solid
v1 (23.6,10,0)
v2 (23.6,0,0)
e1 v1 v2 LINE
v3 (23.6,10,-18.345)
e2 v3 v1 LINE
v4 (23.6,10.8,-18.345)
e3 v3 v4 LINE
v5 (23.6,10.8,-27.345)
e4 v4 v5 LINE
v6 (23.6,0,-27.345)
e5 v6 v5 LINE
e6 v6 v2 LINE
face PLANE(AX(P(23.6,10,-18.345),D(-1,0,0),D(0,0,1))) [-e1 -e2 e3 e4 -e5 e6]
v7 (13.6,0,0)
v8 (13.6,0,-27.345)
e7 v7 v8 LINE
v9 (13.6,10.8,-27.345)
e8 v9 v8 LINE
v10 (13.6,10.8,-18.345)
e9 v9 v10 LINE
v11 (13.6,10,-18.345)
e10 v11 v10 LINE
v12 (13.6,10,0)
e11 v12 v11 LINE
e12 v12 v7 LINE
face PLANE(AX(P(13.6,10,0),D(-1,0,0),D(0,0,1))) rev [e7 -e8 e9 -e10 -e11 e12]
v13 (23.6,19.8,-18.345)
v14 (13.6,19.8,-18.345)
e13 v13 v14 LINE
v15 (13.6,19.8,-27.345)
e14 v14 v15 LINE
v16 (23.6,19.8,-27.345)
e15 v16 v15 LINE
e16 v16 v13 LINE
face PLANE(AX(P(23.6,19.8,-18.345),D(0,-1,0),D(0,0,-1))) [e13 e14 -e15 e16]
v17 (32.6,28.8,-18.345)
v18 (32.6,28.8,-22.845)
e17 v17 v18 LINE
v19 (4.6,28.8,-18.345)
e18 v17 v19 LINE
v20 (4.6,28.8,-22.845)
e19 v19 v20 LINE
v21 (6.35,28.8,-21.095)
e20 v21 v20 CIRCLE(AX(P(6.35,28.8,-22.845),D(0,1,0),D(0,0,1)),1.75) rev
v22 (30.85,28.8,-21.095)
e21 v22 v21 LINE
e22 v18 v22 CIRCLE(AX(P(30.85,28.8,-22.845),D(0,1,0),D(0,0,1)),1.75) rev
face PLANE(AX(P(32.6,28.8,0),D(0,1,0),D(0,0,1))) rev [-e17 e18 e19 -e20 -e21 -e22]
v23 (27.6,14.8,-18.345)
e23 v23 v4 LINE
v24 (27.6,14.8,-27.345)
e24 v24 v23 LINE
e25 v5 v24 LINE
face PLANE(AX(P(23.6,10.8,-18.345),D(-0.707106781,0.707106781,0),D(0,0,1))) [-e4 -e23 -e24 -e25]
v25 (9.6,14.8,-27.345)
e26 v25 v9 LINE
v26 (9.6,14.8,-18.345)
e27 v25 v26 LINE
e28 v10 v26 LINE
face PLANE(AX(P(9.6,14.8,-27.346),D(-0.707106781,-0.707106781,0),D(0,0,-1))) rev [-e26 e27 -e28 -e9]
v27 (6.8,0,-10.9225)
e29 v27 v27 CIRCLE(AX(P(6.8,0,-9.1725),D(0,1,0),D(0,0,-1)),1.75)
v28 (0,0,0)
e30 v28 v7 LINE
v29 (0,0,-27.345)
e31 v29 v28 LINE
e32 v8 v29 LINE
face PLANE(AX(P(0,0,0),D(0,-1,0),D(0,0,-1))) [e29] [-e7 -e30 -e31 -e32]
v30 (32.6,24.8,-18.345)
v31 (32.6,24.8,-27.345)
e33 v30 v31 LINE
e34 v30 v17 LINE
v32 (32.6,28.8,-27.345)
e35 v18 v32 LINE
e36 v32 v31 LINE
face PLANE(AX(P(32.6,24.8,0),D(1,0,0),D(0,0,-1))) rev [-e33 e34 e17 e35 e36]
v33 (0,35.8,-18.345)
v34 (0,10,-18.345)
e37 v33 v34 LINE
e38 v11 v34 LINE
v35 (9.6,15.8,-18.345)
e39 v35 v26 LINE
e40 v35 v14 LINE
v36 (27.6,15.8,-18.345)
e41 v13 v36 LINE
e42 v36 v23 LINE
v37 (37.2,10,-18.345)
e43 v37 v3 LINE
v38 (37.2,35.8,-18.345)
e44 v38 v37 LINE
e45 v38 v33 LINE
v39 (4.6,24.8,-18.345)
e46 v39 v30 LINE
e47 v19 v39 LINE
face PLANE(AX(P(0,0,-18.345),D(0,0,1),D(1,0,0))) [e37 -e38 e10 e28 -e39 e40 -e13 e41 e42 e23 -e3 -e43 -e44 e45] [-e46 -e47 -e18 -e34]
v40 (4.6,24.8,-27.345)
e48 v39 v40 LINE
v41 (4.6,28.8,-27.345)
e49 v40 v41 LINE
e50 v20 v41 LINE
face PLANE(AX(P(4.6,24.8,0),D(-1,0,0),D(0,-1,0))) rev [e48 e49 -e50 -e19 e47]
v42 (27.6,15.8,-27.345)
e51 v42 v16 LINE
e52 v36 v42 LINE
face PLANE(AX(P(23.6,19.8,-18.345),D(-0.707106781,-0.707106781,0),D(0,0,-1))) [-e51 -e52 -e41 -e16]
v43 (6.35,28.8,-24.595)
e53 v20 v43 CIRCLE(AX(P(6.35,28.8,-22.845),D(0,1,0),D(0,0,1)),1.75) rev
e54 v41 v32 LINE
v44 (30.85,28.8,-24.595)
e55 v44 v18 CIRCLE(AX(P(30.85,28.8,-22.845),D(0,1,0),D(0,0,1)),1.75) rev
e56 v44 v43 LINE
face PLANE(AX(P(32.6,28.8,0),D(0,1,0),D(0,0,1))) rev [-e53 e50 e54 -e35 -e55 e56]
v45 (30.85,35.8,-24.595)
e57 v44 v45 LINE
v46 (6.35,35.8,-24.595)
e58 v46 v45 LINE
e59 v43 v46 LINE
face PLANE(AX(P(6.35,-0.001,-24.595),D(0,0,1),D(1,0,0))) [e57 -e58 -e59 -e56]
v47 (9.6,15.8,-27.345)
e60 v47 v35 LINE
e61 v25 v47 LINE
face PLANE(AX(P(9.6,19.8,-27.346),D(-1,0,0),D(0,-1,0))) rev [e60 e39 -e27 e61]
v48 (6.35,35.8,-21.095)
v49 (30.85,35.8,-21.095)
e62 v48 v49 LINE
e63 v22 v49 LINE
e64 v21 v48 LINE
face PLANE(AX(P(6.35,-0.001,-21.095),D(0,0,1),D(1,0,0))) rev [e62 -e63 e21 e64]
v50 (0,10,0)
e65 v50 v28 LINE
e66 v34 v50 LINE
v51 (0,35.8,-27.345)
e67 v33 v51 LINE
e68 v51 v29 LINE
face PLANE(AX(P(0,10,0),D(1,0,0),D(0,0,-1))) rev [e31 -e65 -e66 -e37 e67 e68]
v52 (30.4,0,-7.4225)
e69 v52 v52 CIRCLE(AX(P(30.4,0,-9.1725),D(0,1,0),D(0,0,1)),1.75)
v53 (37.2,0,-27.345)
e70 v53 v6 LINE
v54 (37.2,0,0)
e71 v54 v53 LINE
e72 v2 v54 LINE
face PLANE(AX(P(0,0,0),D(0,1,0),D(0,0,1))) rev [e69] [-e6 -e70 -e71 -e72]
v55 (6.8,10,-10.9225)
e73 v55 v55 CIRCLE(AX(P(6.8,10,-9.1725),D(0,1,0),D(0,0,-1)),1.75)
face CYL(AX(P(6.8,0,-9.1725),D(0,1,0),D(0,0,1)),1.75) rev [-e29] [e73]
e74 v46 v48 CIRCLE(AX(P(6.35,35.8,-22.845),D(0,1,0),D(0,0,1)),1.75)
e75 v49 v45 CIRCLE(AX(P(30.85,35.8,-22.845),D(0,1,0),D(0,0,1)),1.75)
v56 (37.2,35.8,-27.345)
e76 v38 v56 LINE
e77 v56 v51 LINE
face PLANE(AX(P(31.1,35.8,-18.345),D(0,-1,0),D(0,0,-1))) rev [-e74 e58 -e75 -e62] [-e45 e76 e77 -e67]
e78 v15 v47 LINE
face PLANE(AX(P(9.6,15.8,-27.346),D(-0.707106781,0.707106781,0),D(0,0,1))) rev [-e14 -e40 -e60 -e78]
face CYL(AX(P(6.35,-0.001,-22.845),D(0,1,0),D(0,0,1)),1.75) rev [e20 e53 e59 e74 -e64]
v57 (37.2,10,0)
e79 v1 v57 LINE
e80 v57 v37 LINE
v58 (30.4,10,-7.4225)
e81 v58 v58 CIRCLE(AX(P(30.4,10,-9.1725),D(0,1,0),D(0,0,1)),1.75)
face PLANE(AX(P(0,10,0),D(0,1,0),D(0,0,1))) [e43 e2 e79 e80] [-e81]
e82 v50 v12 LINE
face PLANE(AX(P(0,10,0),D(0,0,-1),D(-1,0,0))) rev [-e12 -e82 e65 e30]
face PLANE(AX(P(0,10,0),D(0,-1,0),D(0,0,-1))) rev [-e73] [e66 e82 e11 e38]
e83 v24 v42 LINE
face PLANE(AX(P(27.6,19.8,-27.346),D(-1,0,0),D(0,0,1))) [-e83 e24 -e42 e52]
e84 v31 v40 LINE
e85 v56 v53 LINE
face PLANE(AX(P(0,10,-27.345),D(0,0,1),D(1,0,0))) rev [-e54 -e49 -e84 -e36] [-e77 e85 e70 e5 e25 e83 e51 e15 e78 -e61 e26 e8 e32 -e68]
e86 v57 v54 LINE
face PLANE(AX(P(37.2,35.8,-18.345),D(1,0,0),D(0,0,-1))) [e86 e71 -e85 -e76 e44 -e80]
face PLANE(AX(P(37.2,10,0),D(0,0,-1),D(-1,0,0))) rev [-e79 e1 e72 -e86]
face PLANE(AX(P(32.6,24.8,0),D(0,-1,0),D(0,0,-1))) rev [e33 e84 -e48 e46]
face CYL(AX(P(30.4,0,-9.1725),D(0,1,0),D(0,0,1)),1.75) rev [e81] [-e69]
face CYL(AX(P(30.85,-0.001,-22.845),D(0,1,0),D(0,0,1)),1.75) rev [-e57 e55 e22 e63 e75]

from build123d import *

# Parameters (mm, degrees)
SKETCH1_W             = 13.6
SKETCH1_H             = 27.345
BOSS_EXTRUDE1_DEPTH   = 10
BOSS_EXTRUDE1_2_DEPTH = 10
BOSS_EXTRUDE2_DEPTH   = 9
SKETCH3_R             = 1.75
CUT_EXTRUDE1_DEPTH    = 53.888836487
SKETCH6_W             = 28
SKETCH6_H             = 4
CUT_EXTRUDE2_DEPTH    = 59.422846772
CUT_EXTRUDE3_REACH    = 60.423
CUT_EXTRUDE4_START    = -9
SKETCH8_W             = 18
SKETCH8_H             = 5
CUT_EXTRUDE4_DEPTH    = 9
CHAMFER2_SIZE         = 4


with BuildPart() as part:
    # Sketch1 → Boss-Extrude1 (new body)
    with BuildSketch(Plane(origin=(0, 0, 0), x_dir=(1, 0, 0), z_dir=(0, 1, 0))):
        with Locations((6.8, 13.6725)):
            Rectangle(SKETCH1_W, SKETCH1_H)
    extrude(amount=BOSS_EXTRUDE1_DEPTH)



with BuildPart() as body_2:
    # Sketch1 → Boss-Extrude1 2 (new body)
    with BuildSketch(Plane(origin=(0, 0, 0), x_dir=(1, 0, 0), z_dir=(0, 1, 0))):
        with Locations((30.4, 13.6725)):
            Rectangle(SKETCH1_W, SKETCH1_H)
    extrude(amount=BOSS_EXTRUDE1_2_DEPTH)


with BuildPart() as part_1:
    add(part.part)

    add(body_2.part)  # Boss-Extrude2 merges body 2
    # Sketch2 → Boss-Extrude2 (add)
    with BuildSketch(Plane(origin=(0, 0, -27.345), x_dir=(-1, 0, 0), z_dir=(0, 0, -1))):
        Polygon((-37.2, 35.8), (-37.2, 10), (-31.1, 22), (-31.1, 35.8), align=None)
        Polygon((-31.1, 22), (-37.2, 10), (-31.1, 10), align=None)
        Polygon((-31.1, 35.8), (-31.1, 22), (-31.1, 10), (-23.6, 10), (-23.6, 19.8), (-13.6, 19.8), (-13.6, 10), (-6.1, 10), (-6.1, 22), (-6.1, 35.8), align=None)
        Polygon((0, 35.8), (-6.1, 35.8), (-6.1, 22), (0, 10), align=None)
        Polygon((0, 10), (-6.1, 22), (-6.1, 10), align=None)
    extrude(amount=-BOSS_EXTRUDE2_DEPTH)

    # Sketch3 → Cut-Extrude1 (cut, through all)
    with BuildSketch(Plane(origin=(0, 10, 0), x_dir=(1, 0, 0), z_dir=(0, 1, 0))):
        with Locations(Location((30.4, 9.1725, 0), (0, 0, 270))):
            Circle(SKETCH3_R)
        with Locations(Location((6.8, 9.1725, 0), (0, 0, 90))):
            Circle(SKETCH3_R)
    extrude(amount=-CUT_EXTRUDE1_DEPTH, mode=Mode.SUBTRACT)

    # Sketch6 → Cut-Extrude2 (cut, through all)
    with BuildSketch(Plane(origin=(0, 0, -27.345), x_dir=(-1, 0, 0), z_dir=(0, 0, -1))):
        with Locations((-18.6, 26.8)):
            Rectangle(SKETCH6_W, SKETCH6_H)
    extrude(amount=-CUT_EXTRUDE2_DEPTH, mode=Mode.SUBTRACT)

    # Sketch5 → Cut-Extrude3 (cut, up to next)
    with BuildSketch(Plane(origin=(0, 35.8, 0), x_dir=(1, 0, 0), z_dir=(0, 1, 0)), mode=Mode.PRIVATE) as cut_extrude3_sk1:
        with BuildLine():
            Line((6.35, 24.595), (30.85, 24.595))
            ThreePointArc((30.85, 24.595), (32.6, 22.845), (30.85, 21.095))
            Line((30.85, 21.095), (6.35, 21.095))
            ThreePointArc((6.35, 21.095), (4.6, 22.845), (6.35, 24.595))
        make_face()
    cut_extrude3_tool1 = extrude(cut_extrude3_sk1.sketch, amount=-CUT_EXTRUDE3_REACH, mode=Mode.PRIVATE) & part_1.part
    add(cut_extrude3_tool1.solids().sort_by_distance((18.6, 35.8, -22.845))[0], mode=Mode.SUBTRACT)

    # Sketch8 → Cut-Extrude4 (cut)
    with BuildSketch(Plane.XY.offset(-18.345).offset(CUT_EXTRUDE4_START)):
        with Locations((18.6, 17.3)):
            Rectangle(SKETCH8_W, SKETCH8_H)
    extrude(amount=CUT_EXTRUDE4_DEPTH, mode=Mode.SUBTRACT)

    # Chamfer2
    chamfer2_edges = [part_1.edges().sort_by_distance(p)[0] for p in [
        (27.6, 19.8, -22.845),
        (9.6, 19.8, -22.845),
    ]]
    chamfer(chamfer2_edges, length=CHAMFER2_SIZE)
    chamfer2_2_edges = [part_1.edges().sort_by_distance(p)[0] for p in [
        (23.6, 14.8, -22.845),
        (13.6, 14.8, -22.845),
    ]]
    chamfer(chamfer2_2_edges, length=CHAMFER2_SIZE - 0.0001)  # a hair under: the kernel refuses the full size


solid = part_1.part
